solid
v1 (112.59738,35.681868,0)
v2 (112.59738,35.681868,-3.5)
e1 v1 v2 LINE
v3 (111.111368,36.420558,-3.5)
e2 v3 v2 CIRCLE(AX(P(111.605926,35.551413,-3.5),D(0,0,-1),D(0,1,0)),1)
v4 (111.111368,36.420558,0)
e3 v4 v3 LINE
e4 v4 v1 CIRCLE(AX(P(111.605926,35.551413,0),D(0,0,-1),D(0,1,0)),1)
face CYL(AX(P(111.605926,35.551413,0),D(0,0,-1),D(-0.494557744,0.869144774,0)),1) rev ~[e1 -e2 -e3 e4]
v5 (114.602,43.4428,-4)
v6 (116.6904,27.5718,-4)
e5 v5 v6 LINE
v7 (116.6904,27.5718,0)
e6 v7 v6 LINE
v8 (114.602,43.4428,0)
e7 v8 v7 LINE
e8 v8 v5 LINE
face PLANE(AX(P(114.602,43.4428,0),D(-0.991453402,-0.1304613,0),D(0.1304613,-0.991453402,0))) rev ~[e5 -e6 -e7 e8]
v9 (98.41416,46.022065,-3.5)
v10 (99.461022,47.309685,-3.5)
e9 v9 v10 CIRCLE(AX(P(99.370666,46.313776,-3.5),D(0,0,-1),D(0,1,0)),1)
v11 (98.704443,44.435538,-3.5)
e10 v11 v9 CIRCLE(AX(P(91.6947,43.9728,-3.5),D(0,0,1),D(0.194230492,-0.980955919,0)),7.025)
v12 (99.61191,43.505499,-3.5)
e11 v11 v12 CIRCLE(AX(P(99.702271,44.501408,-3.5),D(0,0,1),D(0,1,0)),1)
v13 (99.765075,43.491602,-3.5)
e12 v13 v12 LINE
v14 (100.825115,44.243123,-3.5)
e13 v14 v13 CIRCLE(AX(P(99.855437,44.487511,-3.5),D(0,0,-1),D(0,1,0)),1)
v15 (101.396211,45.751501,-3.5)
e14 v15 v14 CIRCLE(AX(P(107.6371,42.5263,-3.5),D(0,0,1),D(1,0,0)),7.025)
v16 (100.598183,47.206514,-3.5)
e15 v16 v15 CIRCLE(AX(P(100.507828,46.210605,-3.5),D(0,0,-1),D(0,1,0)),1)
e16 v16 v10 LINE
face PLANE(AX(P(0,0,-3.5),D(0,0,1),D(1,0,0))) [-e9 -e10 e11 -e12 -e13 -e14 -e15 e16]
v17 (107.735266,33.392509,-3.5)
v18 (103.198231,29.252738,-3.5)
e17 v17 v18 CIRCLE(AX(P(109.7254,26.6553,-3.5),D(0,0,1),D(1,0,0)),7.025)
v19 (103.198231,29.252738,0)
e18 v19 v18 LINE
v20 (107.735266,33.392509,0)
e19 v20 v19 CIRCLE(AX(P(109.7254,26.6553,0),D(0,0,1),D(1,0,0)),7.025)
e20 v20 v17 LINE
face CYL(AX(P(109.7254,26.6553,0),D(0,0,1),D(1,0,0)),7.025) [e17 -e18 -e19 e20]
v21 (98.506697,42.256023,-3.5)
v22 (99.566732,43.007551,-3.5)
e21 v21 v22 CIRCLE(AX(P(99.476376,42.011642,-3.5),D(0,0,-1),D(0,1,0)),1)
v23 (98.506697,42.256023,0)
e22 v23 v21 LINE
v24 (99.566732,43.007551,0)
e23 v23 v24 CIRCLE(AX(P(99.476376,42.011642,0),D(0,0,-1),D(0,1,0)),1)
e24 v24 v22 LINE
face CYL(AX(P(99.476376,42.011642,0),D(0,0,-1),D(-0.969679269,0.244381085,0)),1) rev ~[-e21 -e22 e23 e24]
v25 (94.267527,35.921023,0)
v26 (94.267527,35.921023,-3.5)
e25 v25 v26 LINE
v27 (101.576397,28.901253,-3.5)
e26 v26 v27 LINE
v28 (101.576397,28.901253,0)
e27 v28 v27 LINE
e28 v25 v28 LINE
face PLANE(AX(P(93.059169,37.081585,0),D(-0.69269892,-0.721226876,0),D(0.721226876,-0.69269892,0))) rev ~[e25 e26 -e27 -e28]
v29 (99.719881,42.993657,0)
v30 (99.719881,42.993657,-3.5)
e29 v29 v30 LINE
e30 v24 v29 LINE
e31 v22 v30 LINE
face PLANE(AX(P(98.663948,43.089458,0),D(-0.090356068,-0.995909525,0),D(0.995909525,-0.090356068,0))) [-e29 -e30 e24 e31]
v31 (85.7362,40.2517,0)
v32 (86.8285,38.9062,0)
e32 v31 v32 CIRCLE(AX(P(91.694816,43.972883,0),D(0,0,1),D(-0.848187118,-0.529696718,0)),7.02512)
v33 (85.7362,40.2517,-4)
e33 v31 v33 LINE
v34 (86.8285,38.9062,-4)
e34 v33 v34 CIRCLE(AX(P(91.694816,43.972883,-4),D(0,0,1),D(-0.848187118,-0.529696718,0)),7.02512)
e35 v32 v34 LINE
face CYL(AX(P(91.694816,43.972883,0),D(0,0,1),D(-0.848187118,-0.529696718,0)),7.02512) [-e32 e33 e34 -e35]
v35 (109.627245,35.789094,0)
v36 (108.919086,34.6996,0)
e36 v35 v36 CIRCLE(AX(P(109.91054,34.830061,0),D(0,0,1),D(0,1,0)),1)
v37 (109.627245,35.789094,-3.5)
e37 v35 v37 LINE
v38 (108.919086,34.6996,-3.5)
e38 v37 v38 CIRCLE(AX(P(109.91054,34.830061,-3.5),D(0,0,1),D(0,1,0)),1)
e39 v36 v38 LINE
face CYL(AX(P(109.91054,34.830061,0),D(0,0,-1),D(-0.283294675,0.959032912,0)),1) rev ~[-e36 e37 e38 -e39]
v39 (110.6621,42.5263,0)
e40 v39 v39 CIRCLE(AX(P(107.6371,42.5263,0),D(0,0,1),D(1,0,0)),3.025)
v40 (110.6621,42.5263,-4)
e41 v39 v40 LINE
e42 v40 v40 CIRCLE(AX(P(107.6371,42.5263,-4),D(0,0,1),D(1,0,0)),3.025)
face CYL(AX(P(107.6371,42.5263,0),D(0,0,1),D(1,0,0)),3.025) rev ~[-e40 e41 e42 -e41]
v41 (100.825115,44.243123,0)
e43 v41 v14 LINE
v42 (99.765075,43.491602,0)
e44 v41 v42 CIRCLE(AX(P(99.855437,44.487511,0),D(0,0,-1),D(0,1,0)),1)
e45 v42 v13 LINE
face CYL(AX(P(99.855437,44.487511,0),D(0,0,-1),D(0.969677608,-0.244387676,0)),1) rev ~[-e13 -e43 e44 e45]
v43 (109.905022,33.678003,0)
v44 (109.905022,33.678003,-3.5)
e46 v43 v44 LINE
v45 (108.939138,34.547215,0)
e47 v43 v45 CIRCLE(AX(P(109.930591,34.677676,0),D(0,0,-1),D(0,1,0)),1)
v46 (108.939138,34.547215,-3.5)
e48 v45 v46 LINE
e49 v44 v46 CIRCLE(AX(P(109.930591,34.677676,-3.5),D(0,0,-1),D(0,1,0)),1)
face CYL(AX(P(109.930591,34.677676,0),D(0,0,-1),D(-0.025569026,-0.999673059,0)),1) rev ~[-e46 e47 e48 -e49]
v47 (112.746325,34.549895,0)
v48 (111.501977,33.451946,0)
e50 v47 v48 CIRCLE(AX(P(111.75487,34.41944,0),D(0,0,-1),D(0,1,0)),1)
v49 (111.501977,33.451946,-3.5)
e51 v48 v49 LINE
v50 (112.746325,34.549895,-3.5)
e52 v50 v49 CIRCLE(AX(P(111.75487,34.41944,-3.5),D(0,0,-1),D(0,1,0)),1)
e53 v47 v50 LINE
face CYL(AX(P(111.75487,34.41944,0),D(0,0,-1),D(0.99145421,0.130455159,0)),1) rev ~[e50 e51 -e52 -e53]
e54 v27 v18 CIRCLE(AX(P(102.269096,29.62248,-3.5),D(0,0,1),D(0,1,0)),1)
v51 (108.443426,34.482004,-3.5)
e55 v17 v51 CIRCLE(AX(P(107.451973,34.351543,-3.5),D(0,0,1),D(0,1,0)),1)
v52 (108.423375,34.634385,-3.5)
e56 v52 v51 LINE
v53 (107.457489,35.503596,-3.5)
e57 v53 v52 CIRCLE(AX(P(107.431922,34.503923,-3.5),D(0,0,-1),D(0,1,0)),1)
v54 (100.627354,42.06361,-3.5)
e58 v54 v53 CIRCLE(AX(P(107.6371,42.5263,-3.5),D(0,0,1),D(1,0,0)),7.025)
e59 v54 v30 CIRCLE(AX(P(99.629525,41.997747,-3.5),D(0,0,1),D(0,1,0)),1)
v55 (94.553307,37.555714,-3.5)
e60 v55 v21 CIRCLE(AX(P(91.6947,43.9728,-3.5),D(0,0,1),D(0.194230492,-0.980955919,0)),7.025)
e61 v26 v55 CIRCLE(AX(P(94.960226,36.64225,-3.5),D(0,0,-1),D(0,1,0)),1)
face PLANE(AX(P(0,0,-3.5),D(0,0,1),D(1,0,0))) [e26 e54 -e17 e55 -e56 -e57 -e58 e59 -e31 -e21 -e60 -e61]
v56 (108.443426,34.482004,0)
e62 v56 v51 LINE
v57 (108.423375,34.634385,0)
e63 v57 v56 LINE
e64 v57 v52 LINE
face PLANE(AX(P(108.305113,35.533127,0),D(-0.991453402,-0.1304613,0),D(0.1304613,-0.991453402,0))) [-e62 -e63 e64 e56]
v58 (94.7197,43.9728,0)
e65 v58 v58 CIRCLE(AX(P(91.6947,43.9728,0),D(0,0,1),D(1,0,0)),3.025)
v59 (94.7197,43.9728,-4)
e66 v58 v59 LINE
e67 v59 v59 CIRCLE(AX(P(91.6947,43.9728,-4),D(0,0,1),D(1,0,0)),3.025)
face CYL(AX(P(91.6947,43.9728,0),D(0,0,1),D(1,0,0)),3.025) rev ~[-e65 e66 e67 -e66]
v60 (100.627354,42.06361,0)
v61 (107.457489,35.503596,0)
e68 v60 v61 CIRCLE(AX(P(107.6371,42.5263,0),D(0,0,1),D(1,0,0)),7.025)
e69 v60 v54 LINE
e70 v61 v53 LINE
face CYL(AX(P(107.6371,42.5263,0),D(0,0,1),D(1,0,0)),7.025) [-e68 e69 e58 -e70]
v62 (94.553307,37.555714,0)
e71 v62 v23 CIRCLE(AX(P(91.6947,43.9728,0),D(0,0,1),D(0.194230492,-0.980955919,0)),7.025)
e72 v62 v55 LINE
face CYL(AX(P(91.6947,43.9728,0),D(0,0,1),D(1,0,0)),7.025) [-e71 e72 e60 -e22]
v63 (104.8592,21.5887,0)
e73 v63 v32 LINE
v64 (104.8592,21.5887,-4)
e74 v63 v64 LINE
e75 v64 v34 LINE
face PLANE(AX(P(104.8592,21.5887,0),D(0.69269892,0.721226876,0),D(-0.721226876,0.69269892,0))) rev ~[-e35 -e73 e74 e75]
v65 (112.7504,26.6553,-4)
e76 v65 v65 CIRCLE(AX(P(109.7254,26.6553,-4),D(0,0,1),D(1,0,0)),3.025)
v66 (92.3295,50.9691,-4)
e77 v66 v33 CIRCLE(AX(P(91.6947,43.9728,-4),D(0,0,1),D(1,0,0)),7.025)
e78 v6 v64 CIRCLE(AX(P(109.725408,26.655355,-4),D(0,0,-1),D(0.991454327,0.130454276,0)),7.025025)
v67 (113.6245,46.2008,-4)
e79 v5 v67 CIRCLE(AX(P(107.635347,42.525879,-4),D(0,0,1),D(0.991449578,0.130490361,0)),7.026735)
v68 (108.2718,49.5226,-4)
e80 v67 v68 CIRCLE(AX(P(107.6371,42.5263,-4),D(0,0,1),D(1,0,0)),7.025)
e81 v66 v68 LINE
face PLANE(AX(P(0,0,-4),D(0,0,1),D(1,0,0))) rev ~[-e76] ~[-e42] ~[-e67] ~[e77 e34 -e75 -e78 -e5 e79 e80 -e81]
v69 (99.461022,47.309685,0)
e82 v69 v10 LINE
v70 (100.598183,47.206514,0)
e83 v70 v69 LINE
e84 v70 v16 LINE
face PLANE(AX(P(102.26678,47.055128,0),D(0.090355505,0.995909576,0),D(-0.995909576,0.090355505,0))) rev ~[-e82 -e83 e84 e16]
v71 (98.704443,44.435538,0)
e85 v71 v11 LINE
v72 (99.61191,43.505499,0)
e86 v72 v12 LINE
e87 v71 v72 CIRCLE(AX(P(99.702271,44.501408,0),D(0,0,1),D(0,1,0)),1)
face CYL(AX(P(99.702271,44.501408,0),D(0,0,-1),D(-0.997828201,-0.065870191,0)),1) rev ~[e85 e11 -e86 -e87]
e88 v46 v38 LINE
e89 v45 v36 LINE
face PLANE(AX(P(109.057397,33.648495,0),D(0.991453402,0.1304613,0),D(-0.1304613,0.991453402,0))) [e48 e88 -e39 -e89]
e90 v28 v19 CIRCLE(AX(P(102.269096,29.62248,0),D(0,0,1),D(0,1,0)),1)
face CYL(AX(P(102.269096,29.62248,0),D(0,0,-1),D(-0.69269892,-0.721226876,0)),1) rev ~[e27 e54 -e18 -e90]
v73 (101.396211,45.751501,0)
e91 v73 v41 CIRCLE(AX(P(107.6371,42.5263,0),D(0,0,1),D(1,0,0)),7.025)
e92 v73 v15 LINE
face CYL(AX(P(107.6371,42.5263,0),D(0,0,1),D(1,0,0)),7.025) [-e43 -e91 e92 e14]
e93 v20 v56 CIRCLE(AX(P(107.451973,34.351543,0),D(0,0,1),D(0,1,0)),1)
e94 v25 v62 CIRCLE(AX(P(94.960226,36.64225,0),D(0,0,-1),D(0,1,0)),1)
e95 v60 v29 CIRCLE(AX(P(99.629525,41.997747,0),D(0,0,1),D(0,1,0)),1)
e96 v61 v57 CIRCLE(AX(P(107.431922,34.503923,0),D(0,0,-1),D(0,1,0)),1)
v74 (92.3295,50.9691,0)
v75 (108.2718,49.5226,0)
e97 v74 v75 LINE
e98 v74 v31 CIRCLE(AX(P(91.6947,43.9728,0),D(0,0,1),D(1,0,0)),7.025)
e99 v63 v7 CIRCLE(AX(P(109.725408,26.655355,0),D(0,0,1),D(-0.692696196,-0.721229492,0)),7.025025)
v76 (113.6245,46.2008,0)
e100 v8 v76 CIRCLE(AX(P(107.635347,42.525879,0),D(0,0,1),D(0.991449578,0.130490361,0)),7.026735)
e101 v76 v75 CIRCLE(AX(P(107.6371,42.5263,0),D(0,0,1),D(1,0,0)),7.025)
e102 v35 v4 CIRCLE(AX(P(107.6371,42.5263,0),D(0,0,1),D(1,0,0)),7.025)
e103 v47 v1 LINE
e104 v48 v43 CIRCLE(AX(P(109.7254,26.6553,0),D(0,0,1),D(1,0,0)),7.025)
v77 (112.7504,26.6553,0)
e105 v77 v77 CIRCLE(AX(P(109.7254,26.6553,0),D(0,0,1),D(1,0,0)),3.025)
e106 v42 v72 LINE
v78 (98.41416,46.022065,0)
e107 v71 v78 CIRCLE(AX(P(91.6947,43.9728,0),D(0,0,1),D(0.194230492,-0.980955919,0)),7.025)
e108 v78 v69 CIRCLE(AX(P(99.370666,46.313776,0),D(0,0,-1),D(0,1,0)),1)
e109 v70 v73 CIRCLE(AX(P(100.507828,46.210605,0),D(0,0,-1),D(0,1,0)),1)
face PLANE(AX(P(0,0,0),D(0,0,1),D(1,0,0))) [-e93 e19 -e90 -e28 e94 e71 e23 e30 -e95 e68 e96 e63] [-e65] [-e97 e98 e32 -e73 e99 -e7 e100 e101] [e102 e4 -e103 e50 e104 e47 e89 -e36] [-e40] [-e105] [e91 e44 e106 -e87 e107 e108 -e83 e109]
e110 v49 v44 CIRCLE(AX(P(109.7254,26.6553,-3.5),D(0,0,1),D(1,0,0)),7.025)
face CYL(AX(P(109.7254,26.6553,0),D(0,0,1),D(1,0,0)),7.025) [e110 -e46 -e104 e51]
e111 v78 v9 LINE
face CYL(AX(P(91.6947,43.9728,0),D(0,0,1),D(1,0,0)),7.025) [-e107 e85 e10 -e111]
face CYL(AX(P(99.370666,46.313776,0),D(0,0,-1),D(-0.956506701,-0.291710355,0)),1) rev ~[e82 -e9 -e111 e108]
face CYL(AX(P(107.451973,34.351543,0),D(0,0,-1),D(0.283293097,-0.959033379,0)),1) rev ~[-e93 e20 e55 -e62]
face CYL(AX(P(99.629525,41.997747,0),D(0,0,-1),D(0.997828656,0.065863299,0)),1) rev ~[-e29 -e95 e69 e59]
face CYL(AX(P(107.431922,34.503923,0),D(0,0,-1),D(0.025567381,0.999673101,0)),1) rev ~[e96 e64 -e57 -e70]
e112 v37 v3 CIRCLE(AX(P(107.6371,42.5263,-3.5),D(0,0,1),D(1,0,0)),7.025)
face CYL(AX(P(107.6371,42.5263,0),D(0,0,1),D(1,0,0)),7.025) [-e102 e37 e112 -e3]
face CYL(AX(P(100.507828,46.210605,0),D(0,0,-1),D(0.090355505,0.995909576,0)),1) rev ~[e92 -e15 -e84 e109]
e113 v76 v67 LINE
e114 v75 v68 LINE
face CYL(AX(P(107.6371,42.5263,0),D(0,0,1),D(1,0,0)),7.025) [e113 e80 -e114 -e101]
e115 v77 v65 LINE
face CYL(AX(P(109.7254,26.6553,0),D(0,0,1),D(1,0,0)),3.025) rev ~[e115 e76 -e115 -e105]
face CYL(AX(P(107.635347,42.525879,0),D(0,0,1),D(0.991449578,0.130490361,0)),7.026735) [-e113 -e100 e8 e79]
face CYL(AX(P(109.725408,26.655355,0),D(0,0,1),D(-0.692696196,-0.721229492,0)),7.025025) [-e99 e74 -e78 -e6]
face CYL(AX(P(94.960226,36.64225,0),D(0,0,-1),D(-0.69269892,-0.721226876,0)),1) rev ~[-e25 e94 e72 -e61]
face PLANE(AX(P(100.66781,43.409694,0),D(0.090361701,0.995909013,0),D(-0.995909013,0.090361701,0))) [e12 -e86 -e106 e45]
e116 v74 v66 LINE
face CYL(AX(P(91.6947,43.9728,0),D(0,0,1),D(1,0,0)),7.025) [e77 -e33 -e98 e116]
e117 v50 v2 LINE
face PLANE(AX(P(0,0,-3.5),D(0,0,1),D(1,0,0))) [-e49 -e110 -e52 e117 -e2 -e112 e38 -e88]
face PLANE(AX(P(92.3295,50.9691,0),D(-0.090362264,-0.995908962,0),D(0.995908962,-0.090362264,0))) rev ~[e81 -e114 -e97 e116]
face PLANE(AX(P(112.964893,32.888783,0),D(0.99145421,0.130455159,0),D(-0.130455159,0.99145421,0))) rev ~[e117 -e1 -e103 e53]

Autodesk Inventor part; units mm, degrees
ref_plane "YZ Plane" through (0, 0, 0) normal (1, 0, 0) x (0, 1, 0)
ref_plane "XZ Plane" through (0, 0, 0) normal (0, 1, 0) x (-1, 0, 0)
ref_plane "XY Plane" through (0, 0, 0) normal (0, 0, 1) x (1, 0, 0)
sketch "スケッチ1" plane through (0, 0, 0) normal (0, 0, 1) x (1, 0, 0)
  circle A0 centre (68.955, 78.0364) radius 1.25
  arc A1 (82.2061, 79.4541) -> (58.0365, 100.3664) centre (53.5087, 70.7101) ccw
  arc A2 (58.0365, 100.3664) -> (49.826, 85.6345) centre (56.6782, 91.4695) ccw
  line L0 (78.21, 52.3031) -> (49.826, 85.6345)
  line L1 (85.7362, 40.2517) -> (78.21, 52.3031)
  arc A3 (85.7362, 40.2517) -> (86.8285, 38.9062) centre (91.6947, 43.9728) ccw
  line L2 (104.8592, 21.5887) -> (86.8285, 38.9062)
  arc A4 (104.8592, 21.5887) -> (116.6904, 27.5718) centre (109.7254, 26.6553) ccw
  line L3 (114.602, 43.4428) -> (116.6904, 27.5718)
  arc A5 (114.602, 43.4428) -> (113.6245, 46.2008) centre (107.6371, 42.5263) ccw
  line L4 (100.6394, 67.3594) -> (113.6245, 46.2008)
  arc A6 (100.6394, 67.3594) -> (89.5888, 73.7904) centre (89.1334, 60.2981) ccw
  arc A7 (82.2061, 79.4541) -> (89.5888, 73.7904) centre (89.8587, 81.7859) ccw
  circle A8 centre (89.1334, 60.2981) radius 8.525
  circle A9 centre (109.7254, 26.6553) radius 3.025
  circle A10 centre (107.6371, 42.5263) radius 3.025
  circle A11 centre (91.6947, 43.9728) radius 3.025
  circle A12 centre (56.6782, 91.4695) radius 1.25
  circle A13 centre (109.7254, 26.6553) radius 7.025
  circle A14 centre (91.6947, 43.9728) radius 7.025
  circle A15 centre (107.6371, 42.5263) radius 7.025
  line L5 (92.3295, 50.9691) -> (108.2718, 49.5226)
  point P0 (0, 0)
  point P1 (0, 0)
extrude "押し出し1" add sketch "スケッチ1" against normal blind 4 contours A5 A15 | A14 A3 | L3 A13 L2 A14 L5 A15 | A4 A13
sketch "スケッチ2" plane through (0, 0, 0) normal (0, 0, 1) x (1, 0, 0)
  arc A0 (104.8592, 21.5887) -> (116.6904, 27.5718) centre (109.7254, 26.6553) ccw projected
  line L0 (116.6904, 27.5718) -> (114.602, 43.4428) projected
  arc A1 (114.602, 43.4428) -> (108.2718, 49.5226) centre (107.6371, 42.5263) ccw projected
  line L1 (108.2718, 49.5226) -> (92.3295, 50.9691) projected
  arc A2 (92.3295, 50.9691) -> (86.8285, 38.9062) centre (91.6947, 43.9728) ccw projected
  line L2 (86.8285, 38.9062) -> (104.8592, 21.5887) projected
  circle A3 centre (107.6371, 42.5263) radius 3.025 projected
  circle A4 centre (109.7254, 26.6553) radius 3.025 projected
  circle A5 centre (91.6947, 43.9728) radius 3.025 projected
  line L3 (108.2718, 49.5226) -> (92.3295, 50.9691) projected
  circle A6 centre (109.7254, 26.6553) radius 3.025 projected
  arc A7 (104.8592, 21.5887) -> (116.6904, 27.5718) centre (109.7254, 26.6553) ccw projected
  point P0 (0, 0)
sketch "スケッチ3" plane through (0, 0, 0) normal (0, 0, 1) x (1, 0, 0)
  arc A0 (104.8592, 21.5887) -> (116.6904, 27.5718) centre (109.7254, 26.6553) ccw projected
  line L0 (116.6904, 27.5718) -> (114.602, 43.4428) projected
  arc A1 (114.602, 43.4428) -> (108.2718, 49.5226) centre (107.6371, 42.5263) ccw projected
  line L1 (108.2718, 49.5226) -> (92.3295, 50.9691) projected
  arc A2 (92.3295, 50.9691) -> (86.8285, 38.9062) centre (91.6947, 43.9728) ccw projected
  line L2 (86.8285, 38.9062) -> (104.8592, 21.5887) projected
  circle A3 centre (107.6371, 42.5263) radius 3.025 projected
  circle A4 centre (109.7254, 26.6553) radius 3.025 projected
  circle A5 centre (91.6947, 43.9728) radius 3.025 projected
  arc A6 (106.9373, 23.7524) -> (113.716, 27.1804) centre (109.7254, 26.6553) ccw
  line L3 (113.716, 27.1804) -> (111.6277, 43.0514)
  arc A7 (111.6277, 43.0514) -> (108.0008, 46.5349) centre (107.6371, 42.5263) ccw
  line L4 (108.0008, 46.5349) -> (92.0584, 47.9813)
  arc A8 (92.0584, 47.9813) -> (88.9066, 41.0699) centre (91.6947, 43.9728) ccw
  line L5 (88.9066, 41.0699) -> (106.9373, 23.7524)
  line L6 (104.8592, 21.5887) -> (86.8285, 38.9062) projected
  circle A9 centre (91.6947, 43.9728) radius 7.025
  line L7 (114.602, 43.4428) -> (116.6904, 27.5718) projected
  circle A10 centre (107.6371, 42.5263) radius 7.025
  circle A11 centre (109.7254, 26.6553) radius 7.025
  point P0 (0, 0)
  point P1 (102.7848, 27.7407)
  point P2 (112.9649, 32.8888)
  point P3 (112.3788, 37.343)
  point P4 (102.2667, 47.0551)
  point P5 (97.7925, 47.4611)
  point P6 (93.0592, 37.0816)
  dimension "d2" = 3
extrude "押し出し2" cut sketch "スケッチ3" against normal blind 3.5 contours L5 A9 L4 A10 L3 A11
sketch "スケッチ4" plane through (0, 0, 0) normal (0, 0, 1) x (1, 0, 0)
  line L0 (112.3788, 37.343) -> (112.9649, 32.8888) projected
  arc A0 (112.9649, 32.8888) -> (102.7848, 27.7407) centre (109.7254, 26.6553) ccw projected
  line L1 (102.7848, 27.7407) -> (93.0592, 37.0816) projected
  arc A1 (93.0592, 37.0816) -> (97.7925, 47.4611) centre (91.6947, 43.9728) ccw projected
  line L2 (97.7925, 47.4611) -> (102.2667, 47.0551) projected
  arc A2 (102.2667, 47.0551) -> (112.3788, 37.343) centre (107.6371, 42.5263) ccw projected
  arc A3 (104.8592, 21.5887) -> (116.6904, 27.5718) centre (109.7254, 26.6553) ccw projected
  line L3 (116.6904, 27.5718) -> (114.602, 43.4428) projected
  arc A4 (114.602, 43.4428) -> (108.2718, 49.5226) centre (107.6371, 42.5263) ccw projected
  line L4 (108.2718, 49.5226) -> (92.3295, 50.9691) projected
  arc A5 (92.3295, 50.9691) -> (86.8285, 38.9062) centre (91.6947, 43.9728) ccw projected
  line L5 (86.8285, 38.9062) -> (104.8592, 21.5887) projected
  circle A6 centre (107.6371, 42.5263) radius 3.025 projected
  circle A7 centre (109.7254, 26.6553) radius 3.025 projected
  circle A8 centre (91.6947, 43.9728) radius 3.025 projected
  arc A9 (102.2667, 47.0551) -> (112.3788, 37.343) centre (107.6371, 42.5263) ccw projected
  line L6 (91.6947, 43.9728) -> (107.6371, 42.5263) construction
  line L7 (91.6722, 43.7238) -> (107.6145, 42.2774)
  line L8 (107.6597, 42.7753) -> (91.7173, 44.2218)
  arc A10 (91.7173, 44.2218) -> (91.6722, 43.7238) centre (91.6947, 43.9728) ccw
  arc A11 (107.6145, 42.2774) -> (107.6597, 42.7753) centre (107.6371, 42.5263) ccw
  line L9 (107.6371, 42.5263) -> (109.7254, 26.6553) construction
  line L10 (107.3892, 42.4937) -> (109.4776, 26.6227)
  line L11 (109.9733, 26.688) -> (107.8849, 42.559)
  arc A12 (107.8849, 42.559) -> (107.3892, 42.4937) centre (107.6371, 42.5263) ccw
  arc A13 (109.4776, 26.6227) -> (109.9733, 26.688) centre (109.7254, 26.6553) ccw
  point P0 (0, 0)
  point P1 (99.6659, 43.2496)
  point P2 (108.6812, 34.5908)
  point P3 (109.0574, 33.6485)
  point P4 (108.8008, 35.5984)
  point P5 (108.3051, 35.5332)
  point P6 (108.5617, 33.5833)
  point P7 (100.6678, 43.4097)
  point P8 (98.7092, 43.5874)
  point P9 (98.664, 43.0895)
  point P10 (100.6227, 42.9117)
  dimension "d9" = 0.5
  dimension "d10" = 0.5
extrude "押し出し3" add sketch "スケッチ4" against normal blind 4 contours L11 A0 L10 A2 | L7 A1 L8 A2
fillet "フィレット1" radius 1 14 edges at (97.7925, 47.4611, -1.75) (102.2667, 47.0551, -1.75) (98.7092, 43.5874, -1.75) (98.664, 43.0895, -1.75) (100.6678, 43.4097, -1.75) (100.6227, 42.9117, -1.75) (93.0592, 37.0816, -1.75) (112.3788, 37.343, -1.75) (112.9649, 32.8888, -1.75) (108.8008, 35.5984, -1.75) (108.3051, 35.5332, -1.75) (109.0574, 33.6485, -1.75) (108.5617, 33.5833, -1.75) (102.7848, 27.7407, -1.75)
properties part number "アーム 中間節 中詰め" material "ABS プラスチック"
